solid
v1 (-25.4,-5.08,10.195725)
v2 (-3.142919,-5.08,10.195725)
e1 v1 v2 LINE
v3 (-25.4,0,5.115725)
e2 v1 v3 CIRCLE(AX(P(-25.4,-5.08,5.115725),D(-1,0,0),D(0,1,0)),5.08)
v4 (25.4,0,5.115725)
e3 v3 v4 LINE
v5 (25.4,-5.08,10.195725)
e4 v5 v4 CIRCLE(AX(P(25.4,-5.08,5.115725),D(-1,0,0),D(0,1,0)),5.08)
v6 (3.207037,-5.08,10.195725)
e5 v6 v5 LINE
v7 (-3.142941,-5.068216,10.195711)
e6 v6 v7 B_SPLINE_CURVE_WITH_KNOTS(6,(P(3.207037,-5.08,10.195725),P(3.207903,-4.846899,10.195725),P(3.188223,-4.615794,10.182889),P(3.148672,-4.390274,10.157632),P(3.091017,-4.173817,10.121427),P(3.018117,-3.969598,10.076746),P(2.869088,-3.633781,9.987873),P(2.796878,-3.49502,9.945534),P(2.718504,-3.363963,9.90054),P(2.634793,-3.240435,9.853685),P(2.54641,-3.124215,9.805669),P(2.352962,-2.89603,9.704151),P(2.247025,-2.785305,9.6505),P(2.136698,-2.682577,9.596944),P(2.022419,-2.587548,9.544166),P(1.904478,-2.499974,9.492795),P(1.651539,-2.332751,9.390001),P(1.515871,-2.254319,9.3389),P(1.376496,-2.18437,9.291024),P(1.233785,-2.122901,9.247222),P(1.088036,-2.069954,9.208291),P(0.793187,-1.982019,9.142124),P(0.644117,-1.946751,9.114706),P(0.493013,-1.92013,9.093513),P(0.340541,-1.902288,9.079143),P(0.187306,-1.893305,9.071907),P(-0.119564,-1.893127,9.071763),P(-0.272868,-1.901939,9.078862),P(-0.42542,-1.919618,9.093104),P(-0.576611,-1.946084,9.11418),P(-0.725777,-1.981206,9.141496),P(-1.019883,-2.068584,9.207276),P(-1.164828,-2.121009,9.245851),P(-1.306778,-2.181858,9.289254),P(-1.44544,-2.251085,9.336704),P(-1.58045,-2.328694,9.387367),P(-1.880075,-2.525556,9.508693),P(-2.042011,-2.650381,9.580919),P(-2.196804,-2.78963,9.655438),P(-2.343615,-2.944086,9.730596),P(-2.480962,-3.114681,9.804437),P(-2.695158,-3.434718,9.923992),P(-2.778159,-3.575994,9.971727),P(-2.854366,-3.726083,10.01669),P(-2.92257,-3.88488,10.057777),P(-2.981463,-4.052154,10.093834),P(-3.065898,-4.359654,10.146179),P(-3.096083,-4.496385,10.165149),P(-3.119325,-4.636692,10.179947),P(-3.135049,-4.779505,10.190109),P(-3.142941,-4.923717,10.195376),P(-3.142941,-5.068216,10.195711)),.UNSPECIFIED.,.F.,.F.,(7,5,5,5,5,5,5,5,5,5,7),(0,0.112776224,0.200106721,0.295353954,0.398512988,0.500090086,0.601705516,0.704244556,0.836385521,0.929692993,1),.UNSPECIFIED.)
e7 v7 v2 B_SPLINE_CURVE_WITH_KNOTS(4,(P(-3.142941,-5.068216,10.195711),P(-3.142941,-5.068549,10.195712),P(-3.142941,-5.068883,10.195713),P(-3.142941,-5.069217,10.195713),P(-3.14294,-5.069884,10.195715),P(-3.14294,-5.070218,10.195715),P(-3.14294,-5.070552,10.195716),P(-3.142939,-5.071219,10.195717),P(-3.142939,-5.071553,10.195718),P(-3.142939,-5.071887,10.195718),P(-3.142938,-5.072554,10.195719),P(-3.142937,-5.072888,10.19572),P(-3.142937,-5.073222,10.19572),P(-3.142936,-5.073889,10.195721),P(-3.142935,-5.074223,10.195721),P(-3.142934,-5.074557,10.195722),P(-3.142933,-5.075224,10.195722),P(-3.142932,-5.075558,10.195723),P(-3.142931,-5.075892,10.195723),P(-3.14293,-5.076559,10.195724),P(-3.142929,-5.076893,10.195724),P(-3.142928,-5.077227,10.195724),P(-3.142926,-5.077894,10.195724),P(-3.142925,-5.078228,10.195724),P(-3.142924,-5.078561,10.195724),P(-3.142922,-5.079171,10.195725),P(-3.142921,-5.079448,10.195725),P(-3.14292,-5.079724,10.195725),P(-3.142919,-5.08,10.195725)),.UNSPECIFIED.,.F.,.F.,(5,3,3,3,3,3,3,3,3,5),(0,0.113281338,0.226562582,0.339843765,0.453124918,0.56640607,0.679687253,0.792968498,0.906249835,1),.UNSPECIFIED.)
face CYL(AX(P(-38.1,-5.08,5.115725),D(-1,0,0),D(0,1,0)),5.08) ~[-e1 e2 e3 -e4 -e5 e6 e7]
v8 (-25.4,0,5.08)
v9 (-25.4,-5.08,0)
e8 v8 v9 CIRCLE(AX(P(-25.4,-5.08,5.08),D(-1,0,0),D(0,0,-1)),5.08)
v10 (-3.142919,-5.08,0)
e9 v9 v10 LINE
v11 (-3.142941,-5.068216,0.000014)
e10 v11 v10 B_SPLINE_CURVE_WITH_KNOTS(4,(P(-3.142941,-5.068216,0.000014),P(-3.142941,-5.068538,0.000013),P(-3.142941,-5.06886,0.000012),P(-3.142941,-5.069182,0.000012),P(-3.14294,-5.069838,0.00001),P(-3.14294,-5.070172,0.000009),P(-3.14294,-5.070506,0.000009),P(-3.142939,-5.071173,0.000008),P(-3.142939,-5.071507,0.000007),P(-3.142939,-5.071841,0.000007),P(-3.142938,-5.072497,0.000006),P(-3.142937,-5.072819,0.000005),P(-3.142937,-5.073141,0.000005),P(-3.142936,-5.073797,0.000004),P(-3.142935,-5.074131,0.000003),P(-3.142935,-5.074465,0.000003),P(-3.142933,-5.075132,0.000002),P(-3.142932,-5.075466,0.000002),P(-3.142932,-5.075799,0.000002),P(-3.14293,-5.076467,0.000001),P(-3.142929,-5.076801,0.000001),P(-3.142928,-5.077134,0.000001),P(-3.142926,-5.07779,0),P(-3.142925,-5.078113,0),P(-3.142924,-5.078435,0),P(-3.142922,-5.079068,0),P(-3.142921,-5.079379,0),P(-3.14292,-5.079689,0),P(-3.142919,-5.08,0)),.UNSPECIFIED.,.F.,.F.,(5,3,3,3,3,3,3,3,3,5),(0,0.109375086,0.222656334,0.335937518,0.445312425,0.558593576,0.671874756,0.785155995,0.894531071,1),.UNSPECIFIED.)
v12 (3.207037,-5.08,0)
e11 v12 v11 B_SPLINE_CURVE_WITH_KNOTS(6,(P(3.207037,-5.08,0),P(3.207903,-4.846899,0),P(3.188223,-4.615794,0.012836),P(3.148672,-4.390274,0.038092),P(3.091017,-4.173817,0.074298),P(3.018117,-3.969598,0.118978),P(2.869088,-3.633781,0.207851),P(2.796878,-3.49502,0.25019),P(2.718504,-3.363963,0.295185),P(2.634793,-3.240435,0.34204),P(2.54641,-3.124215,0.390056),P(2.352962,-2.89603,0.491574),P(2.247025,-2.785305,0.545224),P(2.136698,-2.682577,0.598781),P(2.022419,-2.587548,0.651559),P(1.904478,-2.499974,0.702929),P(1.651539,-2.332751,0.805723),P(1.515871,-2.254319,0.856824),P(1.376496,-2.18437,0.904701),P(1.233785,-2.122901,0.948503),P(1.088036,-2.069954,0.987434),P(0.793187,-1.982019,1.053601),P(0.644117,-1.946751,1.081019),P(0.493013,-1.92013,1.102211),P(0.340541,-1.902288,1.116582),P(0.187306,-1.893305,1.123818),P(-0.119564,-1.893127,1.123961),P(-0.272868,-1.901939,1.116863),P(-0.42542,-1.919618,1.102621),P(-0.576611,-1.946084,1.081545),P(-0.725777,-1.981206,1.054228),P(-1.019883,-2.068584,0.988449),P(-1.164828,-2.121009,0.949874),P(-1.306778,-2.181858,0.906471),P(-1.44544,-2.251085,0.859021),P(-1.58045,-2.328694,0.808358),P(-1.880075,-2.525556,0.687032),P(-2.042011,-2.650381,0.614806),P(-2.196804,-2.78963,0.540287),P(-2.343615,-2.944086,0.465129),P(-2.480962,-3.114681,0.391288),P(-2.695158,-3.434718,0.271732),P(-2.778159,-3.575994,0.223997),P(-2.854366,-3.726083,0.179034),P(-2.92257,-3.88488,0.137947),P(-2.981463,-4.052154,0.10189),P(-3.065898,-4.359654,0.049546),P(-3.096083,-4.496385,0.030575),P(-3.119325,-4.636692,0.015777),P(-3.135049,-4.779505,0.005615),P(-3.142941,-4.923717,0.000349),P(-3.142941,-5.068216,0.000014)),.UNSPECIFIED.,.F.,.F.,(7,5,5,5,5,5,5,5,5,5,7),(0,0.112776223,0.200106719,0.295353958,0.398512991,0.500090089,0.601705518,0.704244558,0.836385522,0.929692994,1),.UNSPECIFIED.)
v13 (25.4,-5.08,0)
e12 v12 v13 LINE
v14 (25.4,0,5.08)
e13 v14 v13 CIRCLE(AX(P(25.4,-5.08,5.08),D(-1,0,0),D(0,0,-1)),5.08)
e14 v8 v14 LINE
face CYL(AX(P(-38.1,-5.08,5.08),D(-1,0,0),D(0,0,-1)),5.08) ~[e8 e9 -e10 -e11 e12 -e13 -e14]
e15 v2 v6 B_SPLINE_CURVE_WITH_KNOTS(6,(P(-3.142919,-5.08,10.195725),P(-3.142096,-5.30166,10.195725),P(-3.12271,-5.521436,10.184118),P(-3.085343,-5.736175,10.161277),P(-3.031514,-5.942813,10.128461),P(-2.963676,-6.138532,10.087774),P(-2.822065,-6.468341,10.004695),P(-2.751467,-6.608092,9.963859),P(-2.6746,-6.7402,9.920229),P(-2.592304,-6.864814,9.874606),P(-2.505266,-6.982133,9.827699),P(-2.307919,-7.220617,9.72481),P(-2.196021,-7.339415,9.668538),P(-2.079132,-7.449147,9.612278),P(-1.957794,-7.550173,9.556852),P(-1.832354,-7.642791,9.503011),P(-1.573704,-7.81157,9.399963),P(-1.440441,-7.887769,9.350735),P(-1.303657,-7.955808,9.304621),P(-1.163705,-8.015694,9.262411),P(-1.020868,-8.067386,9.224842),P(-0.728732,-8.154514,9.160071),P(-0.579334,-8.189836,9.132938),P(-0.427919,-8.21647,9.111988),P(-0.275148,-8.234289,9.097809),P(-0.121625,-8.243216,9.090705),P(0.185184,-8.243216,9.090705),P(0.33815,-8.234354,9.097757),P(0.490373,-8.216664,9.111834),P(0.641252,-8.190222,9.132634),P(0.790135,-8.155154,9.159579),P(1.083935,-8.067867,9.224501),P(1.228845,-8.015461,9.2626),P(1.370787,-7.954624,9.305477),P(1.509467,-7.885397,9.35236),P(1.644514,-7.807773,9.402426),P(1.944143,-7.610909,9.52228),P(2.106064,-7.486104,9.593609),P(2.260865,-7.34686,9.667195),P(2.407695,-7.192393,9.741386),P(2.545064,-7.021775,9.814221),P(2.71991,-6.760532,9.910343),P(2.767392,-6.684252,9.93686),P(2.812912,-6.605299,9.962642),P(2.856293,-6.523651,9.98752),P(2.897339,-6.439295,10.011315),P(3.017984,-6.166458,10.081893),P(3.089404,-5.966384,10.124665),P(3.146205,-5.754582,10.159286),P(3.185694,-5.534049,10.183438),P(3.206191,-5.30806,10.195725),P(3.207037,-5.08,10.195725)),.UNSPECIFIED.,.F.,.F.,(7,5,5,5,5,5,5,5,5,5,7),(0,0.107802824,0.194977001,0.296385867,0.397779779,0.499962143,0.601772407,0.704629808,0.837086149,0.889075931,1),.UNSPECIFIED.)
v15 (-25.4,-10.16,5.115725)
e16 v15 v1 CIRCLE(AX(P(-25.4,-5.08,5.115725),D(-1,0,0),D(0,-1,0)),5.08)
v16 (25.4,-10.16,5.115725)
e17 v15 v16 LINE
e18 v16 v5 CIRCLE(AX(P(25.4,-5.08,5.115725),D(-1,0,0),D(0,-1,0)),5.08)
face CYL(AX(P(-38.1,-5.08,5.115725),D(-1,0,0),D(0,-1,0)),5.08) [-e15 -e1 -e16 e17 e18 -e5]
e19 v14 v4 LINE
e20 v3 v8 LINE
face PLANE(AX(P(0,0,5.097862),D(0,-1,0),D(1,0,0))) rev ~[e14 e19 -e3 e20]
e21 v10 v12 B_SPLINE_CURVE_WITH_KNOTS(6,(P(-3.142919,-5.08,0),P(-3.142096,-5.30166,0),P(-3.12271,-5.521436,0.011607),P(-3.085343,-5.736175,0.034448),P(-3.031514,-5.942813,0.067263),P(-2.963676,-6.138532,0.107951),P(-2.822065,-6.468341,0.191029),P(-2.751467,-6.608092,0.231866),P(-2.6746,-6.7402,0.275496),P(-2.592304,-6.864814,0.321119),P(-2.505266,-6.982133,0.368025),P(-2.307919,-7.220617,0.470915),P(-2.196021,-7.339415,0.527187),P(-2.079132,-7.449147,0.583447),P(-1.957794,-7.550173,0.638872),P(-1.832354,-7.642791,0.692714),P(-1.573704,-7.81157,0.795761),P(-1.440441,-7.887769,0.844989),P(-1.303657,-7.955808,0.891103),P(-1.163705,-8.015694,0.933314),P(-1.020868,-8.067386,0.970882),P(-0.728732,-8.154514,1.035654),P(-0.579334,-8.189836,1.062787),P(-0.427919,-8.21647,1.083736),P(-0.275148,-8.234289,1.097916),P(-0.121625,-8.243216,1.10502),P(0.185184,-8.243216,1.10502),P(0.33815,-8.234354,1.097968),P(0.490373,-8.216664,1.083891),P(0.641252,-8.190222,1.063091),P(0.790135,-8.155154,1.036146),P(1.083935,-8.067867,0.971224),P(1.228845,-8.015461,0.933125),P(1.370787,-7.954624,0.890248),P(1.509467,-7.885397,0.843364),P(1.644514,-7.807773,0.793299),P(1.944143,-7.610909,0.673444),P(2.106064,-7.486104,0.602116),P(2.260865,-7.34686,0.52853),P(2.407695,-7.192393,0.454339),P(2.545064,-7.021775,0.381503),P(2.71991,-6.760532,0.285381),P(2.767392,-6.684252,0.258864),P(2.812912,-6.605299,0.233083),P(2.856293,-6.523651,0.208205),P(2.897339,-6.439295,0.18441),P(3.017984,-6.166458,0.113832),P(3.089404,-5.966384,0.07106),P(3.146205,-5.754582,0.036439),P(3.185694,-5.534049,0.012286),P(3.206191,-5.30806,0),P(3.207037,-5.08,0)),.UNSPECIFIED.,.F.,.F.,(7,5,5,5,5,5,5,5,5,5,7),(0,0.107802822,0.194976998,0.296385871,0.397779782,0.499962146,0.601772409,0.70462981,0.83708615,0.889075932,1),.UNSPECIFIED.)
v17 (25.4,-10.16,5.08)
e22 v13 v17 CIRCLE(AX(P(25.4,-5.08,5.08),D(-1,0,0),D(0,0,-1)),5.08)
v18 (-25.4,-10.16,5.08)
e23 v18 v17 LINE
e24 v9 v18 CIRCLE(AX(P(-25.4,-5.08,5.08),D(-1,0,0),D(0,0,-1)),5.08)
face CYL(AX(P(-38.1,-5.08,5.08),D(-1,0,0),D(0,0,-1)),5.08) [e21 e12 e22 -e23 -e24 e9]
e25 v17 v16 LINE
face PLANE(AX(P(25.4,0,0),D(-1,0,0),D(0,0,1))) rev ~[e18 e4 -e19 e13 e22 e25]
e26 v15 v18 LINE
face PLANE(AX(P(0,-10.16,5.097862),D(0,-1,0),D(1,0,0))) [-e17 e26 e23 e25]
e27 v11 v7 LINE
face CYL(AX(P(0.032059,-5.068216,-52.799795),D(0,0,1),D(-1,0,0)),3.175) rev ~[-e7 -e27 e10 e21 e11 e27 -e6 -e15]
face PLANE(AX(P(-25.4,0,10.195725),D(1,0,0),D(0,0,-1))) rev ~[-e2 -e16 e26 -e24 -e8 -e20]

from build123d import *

# Parameters (mm, degrees)
F1_DEPTH    = 10.16
F3_D        = 6.35
F4_T1_DEPTH = 76.2


# Not quite as in the source:
# - a fillet or chamfer that OpenCascade refuses, or shapes differently, is made with other operations: its cross-section is extruded or revolved along the edge and cut away or added


with BuildPart() as f1:
    # F0 (on Front) → F1 (new body)
    with BuildSketch(Plane.XZ):
        Polygon((-25.4, 0), (0, 0), (25.4, 0), (25.4, 10.1957246661), (0, 10.1957246661), (-25.4, 10.1957246661), align=None)
    extrude(amount=F1_DEPTH)

    # F3 (through all)
    with Locations(Plane(origin=(0, 0, 0), x_dir=(1, 0, 0), z_dir=(0, 0, -1))):
        with Locations((0.0320593305, 5.0682155415)):
            Hole(F3_D / 2)

    # F4: fillet of radius 5.08 on 4 edges, made by hand

    # F4_s2 → F4_t1 (cut)
    with BuildSketch(Plane.YZ.offset(-38.1)):
        with BuildLine():
            ThreePointArc((-10.16, 5.1157246661), (-8.6721024484, 8.7078271145), (-5.08, 10.1957246661))
            Line((-5.08, 10.1957246661), (-10.16, 10.1957246661))
            Line((-10.16, 10.1957246661), (-10.16, 5.1157246661))
        make_face()
        with BuildLine():
            ThreePointArc((0, 5.1157246661), (-1.4878975516, 8.7078271145), (-5.08, 10.1957246661))
            Line((-5.08, 10.1957246661), (0, 10.1957246661))
            Line((0, 10.1957246661), (0, 5.1157246661))
        make_face()
        with BuildLine():
            ThreePointArc((-5.08, 0), (-8.6721024484, 1.4878975516), (-10.16, 5.08))
            Line((-10.16, 5.08), (-10.16, 0))
            Line((-10.16, 0), (-5.08, 0))
        make_face()
        with BuildLine():
            ThreePointArc((-5.08, 0), (-1.4878975516, 1.4878975516), (0, 5.08))
            Line((0, 5.08), (0, 0))
            Line((0, 0), (-5.08, 0))
        make_face()
    extrude(amount=F4_T1_DEPTH, mode=Mode.SUBTRACT)


solid = f1.part
